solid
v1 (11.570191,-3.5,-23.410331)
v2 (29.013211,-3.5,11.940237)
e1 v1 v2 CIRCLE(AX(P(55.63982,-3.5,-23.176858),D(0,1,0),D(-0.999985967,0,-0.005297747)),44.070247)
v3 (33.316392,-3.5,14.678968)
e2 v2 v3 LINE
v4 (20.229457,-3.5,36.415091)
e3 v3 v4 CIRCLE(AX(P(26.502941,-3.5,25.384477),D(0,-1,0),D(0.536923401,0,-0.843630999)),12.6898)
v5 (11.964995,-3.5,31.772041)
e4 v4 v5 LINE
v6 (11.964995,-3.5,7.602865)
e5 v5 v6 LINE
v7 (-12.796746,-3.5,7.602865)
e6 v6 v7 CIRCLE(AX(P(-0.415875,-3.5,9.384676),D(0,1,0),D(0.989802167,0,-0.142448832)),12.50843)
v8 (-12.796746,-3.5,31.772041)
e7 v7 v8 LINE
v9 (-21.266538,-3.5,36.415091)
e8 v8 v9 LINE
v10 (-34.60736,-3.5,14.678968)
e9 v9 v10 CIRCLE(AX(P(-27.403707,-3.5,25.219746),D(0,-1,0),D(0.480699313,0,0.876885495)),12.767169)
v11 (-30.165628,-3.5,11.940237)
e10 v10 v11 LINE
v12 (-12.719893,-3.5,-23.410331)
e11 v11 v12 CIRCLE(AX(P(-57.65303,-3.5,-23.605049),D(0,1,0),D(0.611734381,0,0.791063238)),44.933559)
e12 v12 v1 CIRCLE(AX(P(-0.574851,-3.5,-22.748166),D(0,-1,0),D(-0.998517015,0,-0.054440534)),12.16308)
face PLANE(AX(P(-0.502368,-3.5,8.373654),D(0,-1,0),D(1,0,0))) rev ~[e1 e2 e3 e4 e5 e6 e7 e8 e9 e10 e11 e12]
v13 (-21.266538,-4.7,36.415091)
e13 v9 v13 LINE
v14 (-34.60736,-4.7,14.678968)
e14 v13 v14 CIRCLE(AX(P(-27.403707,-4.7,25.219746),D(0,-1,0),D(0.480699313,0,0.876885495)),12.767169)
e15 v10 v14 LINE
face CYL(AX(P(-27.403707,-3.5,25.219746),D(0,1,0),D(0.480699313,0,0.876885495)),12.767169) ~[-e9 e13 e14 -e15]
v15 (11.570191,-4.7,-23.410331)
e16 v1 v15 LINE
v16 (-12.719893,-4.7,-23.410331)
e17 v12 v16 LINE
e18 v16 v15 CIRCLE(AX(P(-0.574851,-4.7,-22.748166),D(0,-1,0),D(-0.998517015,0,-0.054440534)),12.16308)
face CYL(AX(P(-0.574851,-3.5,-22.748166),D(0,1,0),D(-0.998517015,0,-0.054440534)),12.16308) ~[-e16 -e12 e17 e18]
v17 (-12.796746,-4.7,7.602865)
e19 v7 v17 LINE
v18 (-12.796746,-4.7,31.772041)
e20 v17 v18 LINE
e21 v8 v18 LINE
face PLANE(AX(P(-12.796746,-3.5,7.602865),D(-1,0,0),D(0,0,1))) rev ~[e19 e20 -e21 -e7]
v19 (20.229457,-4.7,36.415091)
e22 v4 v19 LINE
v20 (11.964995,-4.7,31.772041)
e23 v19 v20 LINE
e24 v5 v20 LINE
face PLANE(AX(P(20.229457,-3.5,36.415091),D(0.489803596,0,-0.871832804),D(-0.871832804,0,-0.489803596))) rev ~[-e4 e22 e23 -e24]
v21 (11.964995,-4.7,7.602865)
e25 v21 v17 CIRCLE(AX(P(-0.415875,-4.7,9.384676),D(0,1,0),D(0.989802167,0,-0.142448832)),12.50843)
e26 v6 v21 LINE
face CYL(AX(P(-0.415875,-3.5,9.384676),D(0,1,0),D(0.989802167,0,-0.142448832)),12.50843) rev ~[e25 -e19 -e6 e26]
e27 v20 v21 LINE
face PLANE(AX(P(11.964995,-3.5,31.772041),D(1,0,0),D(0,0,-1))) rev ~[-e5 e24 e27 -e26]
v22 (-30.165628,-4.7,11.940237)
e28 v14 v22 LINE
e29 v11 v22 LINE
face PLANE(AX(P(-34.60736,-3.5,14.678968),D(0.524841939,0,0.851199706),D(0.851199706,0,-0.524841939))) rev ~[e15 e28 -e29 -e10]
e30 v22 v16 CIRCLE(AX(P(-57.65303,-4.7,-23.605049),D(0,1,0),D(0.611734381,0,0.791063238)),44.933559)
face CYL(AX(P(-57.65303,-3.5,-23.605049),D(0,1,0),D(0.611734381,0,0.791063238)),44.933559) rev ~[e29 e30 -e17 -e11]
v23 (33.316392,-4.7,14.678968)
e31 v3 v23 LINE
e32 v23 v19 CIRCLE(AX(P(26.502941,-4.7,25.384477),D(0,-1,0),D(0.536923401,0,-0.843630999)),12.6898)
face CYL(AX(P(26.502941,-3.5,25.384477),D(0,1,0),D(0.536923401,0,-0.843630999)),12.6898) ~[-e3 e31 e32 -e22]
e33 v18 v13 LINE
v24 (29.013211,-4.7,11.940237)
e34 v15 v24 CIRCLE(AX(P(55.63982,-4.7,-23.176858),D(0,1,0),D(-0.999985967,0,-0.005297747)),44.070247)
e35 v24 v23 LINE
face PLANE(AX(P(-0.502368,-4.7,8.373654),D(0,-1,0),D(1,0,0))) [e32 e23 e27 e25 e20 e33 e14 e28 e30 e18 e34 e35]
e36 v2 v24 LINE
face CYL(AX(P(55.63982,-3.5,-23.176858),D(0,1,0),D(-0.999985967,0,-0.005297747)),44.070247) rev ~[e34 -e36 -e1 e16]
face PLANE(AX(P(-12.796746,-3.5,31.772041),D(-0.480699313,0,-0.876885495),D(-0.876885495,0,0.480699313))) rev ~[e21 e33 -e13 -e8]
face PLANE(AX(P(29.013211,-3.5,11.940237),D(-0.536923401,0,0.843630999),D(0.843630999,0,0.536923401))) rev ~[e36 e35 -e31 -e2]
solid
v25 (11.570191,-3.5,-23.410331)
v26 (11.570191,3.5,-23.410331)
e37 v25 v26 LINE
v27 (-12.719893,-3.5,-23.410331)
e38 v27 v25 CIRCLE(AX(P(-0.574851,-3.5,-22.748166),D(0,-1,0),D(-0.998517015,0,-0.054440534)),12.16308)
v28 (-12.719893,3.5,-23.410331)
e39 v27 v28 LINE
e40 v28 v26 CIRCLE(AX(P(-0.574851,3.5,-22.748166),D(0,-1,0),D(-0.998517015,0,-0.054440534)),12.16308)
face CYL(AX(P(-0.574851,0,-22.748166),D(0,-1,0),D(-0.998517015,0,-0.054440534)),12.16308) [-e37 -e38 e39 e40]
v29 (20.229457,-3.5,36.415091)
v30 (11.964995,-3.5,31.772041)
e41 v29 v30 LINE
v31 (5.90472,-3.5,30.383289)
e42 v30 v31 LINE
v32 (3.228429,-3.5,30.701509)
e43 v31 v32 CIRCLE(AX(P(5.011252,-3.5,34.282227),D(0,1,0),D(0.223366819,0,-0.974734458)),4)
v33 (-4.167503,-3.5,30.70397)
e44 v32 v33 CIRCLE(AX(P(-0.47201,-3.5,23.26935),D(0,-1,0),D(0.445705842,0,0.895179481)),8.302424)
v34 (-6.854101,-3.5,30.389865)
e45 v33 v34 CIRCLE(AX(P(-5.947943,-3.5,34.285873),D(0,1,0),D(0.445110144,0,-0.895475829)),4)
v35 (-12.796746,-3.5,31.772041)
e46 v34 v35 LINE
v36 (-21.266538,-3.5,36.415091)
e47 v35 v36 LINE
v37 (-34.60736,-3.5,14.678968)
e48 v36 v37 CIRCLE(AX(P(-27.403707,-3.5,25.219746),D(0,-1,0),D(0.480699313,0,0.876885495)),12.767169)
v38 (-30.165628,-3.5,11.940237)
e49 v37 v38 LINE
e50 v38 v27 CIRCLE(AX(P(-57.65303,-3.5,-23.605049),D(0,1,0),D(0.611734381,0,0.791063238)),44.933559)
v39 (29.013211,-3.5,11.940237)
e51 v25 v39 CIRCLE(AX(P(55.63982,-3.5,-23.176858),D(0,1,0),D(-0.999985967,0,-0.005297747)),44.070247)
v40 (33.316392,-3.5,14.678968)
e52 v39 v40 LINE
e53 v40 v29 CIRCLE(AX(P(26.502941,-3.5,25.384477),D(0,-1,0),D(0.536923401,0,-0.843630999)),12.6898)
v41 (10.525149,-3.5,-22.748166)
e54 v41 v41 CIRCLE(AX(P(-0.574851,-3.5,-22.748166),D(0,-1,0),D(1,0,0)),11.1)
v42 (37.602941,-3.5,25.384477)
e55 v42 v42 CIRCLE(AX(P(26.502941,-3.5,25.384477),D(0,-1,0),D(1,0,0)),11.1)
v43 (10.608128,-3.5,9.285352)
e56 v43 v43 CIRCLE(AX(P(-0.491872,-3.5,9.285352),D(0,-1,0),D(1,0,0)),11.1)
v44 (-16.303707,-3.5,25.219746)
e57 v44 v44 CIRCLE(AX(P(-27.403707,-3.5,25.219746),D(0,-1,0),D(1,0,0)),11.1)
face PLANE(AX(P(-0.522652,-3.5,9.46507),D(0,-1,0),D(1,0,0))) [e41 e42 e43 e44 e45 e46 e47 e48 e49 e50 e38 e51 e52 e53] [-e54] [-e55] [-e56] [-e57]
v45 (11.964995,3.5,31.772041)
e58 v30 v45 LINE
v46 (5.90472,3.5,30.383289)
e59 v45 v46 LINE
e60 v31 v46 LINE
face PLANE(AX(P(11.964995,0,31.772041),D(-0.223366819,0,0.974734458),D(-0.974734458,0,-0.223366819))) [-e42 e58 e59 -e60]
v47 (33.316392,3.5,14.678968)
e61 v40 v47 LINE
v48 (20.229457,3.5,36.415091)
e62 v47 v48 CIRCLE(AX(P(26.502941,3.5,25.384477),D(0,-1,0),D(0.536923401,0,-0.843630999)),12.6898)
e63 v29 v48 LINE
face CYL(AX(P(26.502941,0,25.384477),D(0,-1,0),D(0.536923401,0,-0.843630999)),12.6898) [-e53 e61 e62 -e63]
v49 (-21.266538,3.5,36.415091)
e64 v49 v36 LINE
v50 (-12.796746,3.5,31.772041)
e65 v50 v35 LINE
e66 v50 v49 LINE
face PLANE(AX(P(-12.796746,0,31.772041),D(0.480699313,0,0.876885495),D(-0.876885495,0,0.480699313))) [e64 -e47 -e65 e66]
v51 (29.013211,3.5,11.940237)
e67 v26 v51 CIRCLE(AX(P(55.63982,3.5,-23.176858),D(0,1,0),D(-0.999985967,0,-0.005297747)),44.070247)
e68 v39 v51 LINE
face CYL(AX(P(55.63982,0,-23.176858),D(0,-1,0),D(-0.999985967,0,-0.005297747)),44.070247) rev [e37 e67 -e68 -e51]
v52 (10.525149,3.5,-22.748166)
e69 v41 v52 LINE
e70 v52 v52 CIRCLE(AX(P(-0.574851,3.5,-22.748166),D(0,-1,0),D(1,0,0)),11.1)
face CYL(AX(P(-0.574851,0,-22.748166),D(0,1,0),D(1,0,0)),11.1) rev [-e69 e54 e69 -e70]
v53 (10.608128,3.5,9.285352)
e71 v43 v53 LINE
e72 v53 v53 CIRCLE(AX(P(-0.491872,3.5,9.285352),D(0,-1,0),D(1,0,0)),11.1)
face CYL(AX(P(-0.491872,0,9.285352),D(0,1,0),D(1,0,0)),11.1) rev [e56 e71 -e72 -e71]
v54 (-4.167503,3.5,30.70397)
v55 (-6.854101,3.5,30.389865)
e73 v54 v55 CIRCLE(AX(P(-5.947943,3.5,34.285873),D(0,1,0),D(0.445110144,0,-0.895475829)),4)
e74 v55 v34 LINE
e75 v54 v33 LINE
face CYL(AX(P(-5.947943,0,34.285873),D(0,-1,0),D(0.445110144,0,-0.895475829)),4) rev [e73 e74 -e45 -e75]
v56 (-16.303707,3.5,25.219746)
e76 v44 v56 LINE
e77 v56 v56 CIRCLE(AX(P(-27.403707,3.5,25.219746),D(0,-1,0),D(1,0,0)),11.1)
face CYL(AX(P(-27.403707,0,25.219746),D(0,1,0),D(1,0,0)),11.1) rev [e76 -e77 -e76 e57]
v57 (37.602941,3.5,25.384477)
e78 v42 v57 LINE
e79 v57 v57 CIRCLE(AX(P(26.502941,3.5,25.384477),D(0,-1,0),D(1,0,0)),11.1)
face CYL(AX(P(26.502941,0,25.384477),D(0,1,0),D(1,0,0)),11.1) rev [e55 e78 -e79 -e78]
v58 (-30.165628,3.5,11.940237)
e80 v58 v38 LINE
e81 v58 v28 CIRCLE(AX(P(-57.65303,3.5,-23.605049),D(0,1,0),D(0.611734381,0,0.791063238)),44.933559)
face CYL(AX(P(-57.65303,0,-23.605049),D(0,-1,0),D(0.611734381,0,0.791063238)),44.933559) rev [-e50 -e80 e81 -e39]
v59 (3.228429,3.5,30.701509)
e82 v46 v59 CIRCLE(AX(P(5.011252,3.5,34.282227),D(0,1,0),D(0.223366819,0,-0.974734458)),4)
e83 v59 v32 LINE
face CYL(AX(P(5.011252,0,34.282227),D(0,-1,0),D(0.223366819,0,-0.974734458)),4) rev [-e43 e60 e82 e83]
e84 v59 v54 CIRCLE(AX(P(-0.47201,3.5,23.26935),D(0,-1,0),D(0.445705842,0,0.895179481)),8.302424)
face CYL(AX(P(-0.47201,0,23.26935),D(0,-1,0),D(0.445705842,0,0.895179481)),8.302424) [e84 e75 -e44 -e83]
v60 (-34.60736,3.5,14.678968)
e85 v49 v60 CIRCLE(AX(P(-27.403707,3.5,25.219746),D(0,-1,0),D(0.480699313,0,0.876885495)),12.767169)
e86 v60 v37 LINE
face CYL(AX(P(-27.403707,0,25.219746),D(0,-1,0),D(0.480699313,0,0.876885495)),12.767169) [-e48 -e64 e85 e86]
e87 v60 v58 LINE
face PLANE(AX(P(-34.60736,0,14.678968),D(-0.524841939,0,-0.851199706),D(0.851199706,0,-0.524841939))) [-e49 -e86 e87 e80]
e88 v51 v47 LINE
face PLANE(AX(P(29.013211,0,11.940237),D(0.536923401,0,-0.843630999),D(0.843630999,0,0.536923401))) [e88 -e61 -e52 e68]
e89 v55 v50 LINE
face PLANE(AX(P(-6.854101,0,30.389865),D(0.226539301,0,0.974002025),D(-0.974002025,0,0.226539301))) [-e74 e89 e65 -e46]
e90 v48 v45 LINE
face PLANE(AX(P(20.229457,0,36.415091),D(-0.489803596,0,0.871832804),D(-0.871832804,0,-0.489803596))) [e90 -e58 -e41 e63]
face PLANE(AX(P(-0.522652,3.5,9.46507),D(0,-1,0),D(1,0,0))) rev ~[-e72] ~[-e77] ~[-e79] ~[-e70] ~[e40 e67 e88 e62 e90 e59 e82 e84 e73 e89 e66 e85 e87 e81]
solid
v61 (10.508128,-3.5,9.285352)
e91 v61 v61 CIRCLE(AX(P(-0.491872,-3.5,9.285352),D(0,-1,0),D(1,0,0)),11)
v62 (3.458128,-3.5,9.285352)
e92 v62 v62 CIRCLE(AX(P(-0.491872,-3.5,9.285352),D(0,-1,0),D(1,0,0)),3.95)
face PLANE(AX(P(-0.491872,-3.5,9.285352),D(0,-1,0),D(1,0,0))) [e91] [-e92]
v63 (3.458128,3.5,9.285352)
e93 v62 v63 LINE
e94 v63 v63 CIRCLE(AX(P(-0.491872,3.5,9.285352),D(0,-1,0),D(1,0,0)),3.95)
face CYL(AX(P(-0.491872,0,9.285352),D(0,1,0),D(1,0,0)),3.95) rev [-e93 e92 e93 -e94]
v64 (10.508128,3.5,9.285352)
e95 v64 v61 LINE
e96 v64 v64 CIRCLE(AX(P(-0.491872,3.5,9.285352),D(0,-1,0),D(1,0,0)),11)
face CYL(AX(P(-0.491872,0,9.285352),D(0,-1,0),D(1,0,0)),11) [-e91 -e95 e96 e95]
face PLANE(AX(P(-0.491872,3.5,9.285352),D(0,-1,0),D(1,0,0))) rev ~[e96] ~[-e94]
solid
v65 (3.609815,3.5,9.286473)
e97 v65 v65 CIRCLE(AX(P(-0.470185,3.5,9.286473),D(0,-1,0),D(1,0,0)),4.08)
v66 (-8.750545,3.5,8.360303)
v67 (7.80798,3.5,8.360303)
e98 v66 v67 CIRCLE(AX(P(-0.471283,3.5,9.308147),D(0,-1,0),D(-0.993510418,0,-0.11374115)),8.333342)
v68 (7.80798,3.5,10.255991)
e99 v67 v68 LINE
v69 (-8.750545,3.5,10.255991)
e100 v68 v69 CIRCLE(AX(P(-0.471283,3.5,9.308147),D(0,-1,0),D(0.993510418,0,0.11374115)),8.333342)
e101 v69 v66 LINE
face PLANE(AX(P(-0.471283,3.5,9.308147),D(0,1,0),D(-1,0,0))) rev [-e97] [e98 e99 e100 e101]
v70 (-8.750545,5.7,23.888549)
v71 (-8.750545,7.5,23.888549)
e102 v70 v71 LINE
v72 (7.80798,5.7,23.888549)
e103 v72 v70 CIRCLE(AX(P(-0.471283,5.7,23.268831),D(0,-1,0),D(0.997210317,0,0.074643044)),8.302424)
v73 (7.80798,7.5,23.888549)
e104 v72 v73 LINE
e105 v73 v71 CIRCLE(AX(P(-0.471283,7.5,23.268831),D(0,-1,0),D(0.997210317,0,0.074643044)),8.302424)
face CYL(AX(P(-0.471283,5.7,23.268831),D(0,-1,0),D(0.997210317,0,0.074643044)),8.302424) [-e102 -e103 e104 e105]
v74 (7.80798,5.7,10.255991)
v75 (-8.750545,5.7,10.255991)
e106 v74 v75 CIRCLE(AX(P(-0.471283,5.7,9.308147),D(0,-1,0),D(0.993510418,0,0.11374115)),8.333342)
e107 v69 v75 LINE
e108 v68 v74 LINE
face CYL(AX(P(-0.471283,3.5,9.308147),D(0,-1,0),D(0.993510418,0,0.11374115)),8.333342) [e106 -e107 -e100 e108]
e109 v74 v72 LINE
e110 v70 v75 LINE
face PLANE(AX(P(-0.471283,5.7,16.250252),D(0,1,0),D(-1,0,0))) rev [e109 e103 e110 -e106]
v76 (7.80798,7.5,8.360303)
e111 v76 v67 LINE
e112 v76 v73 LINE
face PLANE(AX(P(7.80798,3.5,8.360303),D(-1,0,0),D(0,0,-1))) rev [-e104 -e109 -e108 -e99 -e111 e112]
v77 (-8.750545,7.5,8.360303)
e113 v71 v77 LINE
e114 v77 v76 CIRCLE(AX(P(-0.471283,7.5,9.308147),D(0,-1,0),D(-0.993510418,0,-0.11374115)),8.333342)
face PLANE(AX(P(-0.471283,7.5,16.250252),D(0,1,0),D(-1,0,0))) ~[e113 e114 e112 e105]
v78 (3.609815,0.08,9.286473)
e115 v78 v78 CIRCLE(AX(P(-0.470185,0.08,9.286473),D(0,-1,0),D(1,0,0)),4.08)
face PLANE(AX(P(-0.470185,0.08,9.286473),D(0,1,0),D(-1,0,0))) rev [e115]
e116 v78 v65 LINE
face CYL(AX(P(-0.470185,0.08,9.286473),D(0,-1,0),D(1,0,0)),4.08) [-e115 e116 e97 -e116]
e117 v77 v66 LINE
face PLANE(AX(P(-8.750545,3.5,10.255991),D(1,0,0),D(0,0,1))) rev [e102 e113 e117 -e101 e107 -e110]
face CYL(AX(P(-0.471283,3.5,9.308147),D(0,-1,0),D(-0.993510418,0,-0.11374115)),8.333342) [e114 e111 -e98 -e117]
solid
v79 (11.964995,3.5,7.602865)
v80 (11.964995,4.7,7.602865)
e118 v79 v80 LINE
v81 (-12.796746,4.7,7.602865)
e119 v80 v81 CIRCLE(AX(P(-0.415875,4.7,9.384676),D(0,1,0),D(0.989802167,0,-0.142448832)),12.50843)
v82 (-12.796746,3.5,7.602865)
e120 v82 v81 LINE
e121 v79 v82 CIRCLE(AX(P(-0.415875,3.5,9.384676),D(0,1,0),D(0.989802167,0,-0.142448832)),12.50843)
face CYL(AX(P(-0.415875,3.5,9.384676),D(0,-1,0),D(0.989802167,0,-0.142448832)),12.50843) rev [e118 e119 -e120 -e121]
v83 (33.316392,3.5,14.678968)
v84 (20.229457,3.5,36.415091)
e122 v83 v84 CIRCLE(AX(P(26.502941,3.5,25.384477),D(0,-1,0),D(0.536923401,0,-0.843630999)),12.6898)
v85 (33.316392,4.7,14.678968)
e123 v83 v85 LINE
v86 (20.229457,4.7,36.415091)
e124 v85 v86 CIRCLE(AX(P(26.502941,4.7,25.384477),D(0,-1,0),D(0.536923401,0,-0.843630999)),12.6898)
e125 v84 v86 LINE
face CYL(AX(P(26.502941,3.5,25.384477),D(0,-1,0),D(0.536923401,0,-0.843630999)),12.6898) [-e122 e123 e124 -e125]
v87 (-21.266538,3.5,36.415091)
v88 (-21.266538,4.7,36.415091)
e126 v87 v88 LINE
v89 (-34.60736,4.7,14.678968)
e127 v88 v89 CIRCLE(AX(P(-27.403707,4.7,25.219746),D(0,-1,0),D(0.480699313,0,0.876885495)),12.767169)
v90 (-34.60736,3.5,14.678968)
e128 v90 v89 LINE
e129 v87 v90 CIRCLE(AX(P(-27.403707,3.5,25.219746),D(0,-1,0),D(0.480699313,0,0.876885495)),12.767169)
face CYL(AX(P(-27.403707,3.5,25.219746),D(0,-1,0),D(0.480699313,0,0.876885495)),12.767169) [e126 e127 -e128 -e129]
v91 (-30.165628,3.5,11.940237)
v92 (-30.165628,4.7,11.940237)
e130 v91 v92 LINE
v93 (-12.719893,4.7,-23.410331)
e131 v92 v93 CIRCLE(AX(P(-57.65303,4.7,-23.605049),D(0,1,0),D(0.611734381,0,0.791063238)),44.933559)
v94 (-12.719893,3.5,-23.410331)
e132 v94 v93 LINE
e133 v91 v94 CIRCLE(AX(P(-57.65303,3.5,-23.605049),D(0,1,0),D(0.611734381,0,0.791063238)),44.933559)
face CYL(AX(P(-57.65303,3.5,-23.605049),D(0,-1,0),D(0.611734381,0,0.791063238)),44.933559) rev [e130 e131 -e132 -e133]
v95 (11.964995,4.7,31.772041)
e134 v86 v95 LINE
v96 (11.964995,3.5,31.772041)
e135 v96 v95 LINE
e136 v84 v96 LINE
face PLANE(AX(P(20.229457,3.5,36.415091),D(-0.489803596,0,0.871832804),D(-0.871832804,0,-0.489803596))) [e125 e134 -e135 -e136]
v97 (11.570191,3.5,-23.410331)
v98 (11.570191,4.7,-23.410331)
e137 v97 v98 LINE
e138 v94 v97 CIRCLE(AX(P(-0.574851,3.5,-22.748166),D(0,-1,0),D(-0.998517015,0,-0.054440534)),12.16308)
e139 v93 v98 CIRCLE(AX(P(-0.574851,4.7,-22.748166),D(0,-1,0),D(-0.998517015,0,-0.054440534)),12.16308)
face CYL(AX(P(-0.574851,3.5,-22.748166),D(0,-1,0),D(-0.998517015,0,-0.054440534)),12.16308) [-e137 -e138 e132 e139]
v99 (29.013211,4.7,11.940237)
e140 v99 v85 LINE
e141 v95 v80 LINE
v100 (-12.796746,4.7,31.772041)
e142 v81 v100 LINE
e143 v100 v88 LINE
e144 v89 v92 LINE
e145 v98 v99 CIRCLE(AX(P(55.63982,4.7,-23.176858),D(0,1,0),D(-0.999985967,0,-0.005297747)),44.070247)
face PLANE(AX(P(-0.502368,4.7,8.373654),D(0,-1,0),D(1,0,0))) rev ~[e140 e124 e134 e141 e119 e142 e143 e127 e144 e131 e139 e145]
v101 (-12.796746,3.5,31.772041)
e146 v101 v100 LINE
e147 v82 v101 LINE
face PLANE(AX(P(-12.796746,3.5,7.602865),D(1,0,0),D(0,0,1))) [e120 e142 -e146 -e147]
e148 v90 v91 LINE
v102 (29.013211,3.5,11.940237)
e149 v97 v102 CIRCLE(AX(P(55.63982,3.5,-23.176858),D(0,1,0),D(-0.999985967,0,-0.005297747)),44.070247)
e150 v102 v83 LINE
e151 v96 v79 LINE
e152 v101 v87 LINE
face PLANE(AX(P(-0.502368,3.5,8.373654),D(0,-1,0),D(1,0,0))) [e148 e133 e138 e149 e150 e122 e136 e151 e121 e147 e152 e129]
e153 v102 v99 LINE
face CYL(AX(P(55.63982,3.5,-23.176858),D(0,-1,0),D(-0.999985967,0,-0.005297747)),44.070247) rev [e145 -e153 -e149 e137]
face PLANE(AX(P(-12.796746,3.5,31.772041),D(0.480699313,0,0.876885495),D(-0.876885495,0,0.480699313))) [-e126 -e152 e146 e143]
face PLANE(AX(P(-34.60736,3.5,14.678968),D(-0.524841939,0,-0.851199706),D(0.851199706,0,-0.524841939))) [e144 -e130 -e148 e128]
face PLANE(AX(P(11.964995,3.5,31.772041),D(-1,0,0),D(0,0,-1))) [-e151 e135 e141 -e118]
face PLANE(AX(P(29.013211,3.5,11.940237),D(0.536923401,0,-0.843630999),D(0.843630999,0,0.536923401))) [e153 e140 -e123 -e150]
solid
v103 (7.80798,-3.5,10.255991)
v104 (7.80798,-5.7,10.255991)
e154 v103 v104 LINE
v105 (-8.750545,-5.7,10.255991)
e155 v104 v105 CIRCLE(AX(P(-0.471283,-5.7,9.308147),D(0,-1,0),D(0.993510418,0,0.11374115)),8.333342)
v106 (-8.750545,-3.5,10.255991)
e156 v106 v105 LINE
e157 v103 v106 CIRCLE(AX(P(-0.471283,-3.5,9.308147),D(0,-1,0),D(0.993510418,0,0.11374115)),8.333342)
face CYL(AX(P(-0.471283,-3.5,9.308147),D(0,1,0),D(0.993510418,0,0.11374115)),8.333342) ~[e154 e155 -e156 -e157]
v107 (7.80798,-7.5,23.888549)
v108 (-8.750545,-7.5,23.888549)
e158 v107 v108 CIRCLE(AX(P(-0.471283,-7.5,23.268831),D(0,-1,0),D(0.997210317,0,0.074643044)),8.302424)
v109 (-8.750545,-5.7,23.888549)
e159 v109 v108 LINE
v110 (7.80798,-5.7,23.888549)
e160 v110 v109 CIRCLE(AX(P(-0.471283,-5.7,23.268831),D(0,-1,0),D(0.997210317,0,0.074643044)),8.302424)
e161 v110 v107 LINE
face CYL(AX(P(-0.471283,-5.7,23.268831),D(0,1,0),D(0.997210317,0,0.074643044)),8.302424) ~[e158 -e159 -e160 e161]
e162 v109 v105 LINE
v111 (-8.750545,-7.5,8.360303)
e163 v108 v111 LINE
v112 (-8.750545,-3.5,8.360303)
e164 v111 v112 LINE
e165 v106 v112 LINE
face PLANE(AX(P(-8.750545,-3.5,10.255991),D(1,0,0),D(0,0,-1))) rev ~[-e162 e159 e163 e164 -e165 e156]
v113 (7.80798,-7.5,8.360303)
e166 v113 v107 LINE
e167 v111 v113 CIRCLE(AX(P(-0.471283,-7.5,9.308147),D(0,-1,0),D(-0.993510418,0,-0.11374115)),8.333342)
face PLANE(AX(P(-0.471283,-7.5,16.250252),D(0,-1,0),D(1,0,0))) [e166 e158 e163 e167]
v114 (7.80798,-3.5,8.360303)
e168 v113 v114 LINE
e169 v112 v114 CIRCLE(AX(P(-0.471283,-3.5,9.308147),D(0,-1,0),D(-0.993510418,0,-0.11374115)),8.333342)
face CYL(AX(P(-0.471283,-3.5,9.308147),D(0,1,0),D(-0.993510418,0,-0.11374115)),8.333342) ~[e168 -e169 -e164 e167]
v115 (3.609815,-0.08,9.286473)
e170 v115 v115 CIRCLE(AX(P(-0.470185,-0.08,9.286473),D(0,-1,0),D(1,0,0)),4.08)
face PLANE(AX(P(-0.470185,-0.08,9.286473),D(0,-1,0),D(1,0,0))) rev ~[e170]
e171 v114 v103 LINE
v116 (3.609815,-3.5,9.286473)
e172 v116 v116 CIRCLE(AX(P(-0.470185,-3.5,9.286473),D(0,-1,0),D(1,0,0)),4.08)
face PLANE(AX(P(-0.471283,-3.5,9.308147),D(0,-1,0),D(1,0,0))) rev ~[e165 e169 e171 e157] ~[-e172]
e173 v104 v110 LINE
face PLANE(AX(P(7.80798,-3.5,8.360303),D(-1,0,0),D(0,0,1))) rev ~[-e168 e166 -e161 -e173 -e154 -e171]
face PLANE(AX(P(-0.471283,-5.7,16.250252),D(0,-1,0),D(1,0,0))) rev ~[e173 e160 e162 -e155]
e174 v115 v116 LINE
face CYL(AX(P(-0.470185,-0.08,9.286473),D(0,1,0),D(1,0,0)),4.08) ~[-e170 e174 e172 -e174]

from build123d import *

# Parameters (mm, degrees)
F1_START  = 4.375
F1_DEPTH  = 1.5
F2_R      = 13.875
F3_DEPTH  = 4.375
F5_START  = -4.375
F5_DEPTH  = 1.5
F10_START = 7.125
F10_DEPTH = 2.25
F11_START = -5.5
F11_DEPTH = 2
F12_START = 4.375
F12_DEPTH = 2.75
F13_START = -3.5
F13_DEPTH = 2
F16_START = 0.1
F14_R     = 5.1
F16_DEPTH = 4.275
F17_START = -0.395
F15_R     = 4.14
F17_DEPTH = 3.105
F18_R     = 13.75
F18_R_2   = 4.9375
F19_DEPTH = 4.375
F20_SCALE = 0.8


# Not quite as in the source:
# - a feature names something its author has since deleted; it is built from what else it names


with BuildPart() as f1:
    # F0 (on Front) → F1 (new body)
    with BuildSketch(Plane.XZ.offset(F1_START)):
        with BuildLine():
            Line((25.2868216485, 45.5188639462), (14.9562442675, 39.715051651))
            Line((14.9562442675, 39.715051651), (14.9562442675, 9.5035806298))
            ThreePointArc((14.9562442675, 9.5035806298), (-0.5198442377, -3.9046924703), (-15.995932743, 9.5035806298))
            Line((-15.995932743, 9.5035806298), (-15.995932743, 39.715051651))
            Line((-15.995932743, 39.715051651), (-26.5831723809, 45.5188639462))
            ThreePointArc((-26.5831723809, 45.5188639462), (-47.8560530267, 39.8727264749), (-43.2591997087, 18.3487106115))
            Line((-43.2591997087, 18.3487106115), (-37.7070344985, 14.9252964184))
            ThreePointArc((-37.7070344985, 14.9252964184), (-21.6988985987, -4.6496789904), (-15.8998668194, -29.262913391))
            ThreePointArc((-15.8998668194, -29.262913391), (-0.7185637951, -43.6390577842), (14.4627392292, -29.262913391))
            ThreePointArc((14.4627392292, -29.262913391), (20.148592377, -4.5950626204), (36.2665131688, 14.9252964184))
            Line((36.2665131688, 14.9252964184), (41.6454896331, 18.3487106115))
            ThreePointArc((41.6454896331, 18.3487106115), (46.7179439882, 39.9124542781), (25.2868216485, 45.5188639462))
        make_face()
    extrude(amount=F1_DEPTH)


with BuildPart() as f3:
    # F2 (on Front) → F3 (new body, symmetric)
    with BuildSketch(Plane.XZ):
        with BuildLine():
            ThreePointArc((7.3808994443, 37.9791115091), (5.6737072201, 37.8877583952), (4.0355361424, 38.3768863971))
            ThreePointArc((4.0355361424, 38.3768863971), (-0.5865597778, 39.4647162659), (-5.209378452, 38.3799619045))
            ThreePointArc((-5.209378452, 38.3799619045), (-6.854306785, 37.8911677077), (-8.5676256765, 37.9873309216))
            Line((-8.5676256765, 37.9873309216), (-15.995932743, 39.715051651))
            Line((-15.995932743, 39.715051651), (-26.5831723809, 45.5188639462))
            ThreePointArc((-26.5831723809, 45.5188639462), (-47.8560530267, 39.8727264749), (-43.2591997087, 18.3487106115))
            Line((-43.2591997087, 18.3487106115), (-37.7070344985, 14.9252964184))
            ThreePointArc((-37.7070344985, 14.9252964184), (-21.6988985987, -4.6496789904), (-15.8998668194, -29.262913391))
            ThreePointArc((-15.8998668194, -29.262913391), (-0.7185637951, -43.6390577842), (14.4627392292, -29.262913391))
            ThreePointArc((14.4627392292, -29.262913391), (20.148592377, -4.5950626204), (36.2665131688, 14.9252964184))
            Line((36.2665131688, 14.9252964184), (41.6454896331, 18.3487106115))
            ThreePointArc((41.6454896331, 18.3487106115), (46.7179439882, 39.9124542781), (25.2868216485, 45.5188639462))
            Line((25.2868216485, 45.5188639462), (14.9562442675, 39.715051651))
            Line((14.9562442675, 39.715051651), (7.3808994443, 37.9791115091))
        make_face()
        with Locations((-0.7185637951, -28.4352076707)):
            Circle(F2_R, mode=Mode.SUBTRACT)
        with Locations((-0.6148405476, 11.6066905533)):
            Circle(F2_R, mode=Mode.SUBTRACT)
        with Locations((-34.2546339944, 31.5246824765)):
            Circle(F2_R, mode=Mode.SUBTRACT)
        with Locations((33.1286761467, 31.7305968542)):
            Circle(F2_R, mode=Mode.SUBTRACT)
    extrude(amount=F3_DEPTH, both=True)


with BuildPart() as f5:
    # F4 (on Front) → F5 (new body)
    with BuildSketch(Plane.XZ.offset(F5_START)):
        with BuildLine():
            Line((25.2868216485, 45.5188639462), (14.9562442675, 39.715051651))
            Line((14.9562442675, 39.715051651), (14.9562442675, 9.5035806298))
            ThreePointArc((14.9562442675, 9.5035806298), (-0.5198442377, -3.9046924703), (-15.995932743, 9.5035806298))
            Line((-15.995932743, 9.5035806298), (-15.995932743, 39.715051651))
            Line((-15.995932743, 39.715051651), (-26.5831723809, 45.5188639462))
            ThreePointArc((-26.5831723809, 45.5188639462), (-47.8560530267, 39.8727264749), (-43.2591997087, 18.3487106115))
            Line((-43.2591997087, 18.3487106115), (-37.7070344985, 14.9252964184))
            ThreePointArc((-37.7070344985, 14.9252964184), (-21.6988985987, -4.6496789904), (-15.8998668194, -29.262913391))
            ThreePointArc((-15.8998668194, -29.262913391), (-0.7185637951, -43.6390577842), (14.4627392292, -29.262913391))
            ThreePointArc((14.4627392292, -29.262913391), (20.148592377, -4.5950626204), (36.2665131688, 14.9252964184))
            Line((36.2665131688, 14.9252964184), (41.6454896331, 18.3487106115))
            ThreePointArc((41.6454896331, 18.3487106115), (46.7179439882, 39.9124542781), (25.2868216485, 45.5188639462))
        make_face()
    extrude(amount=-F5_DEPTH)


with BuildPart() as f10:
    # F6 (on Front) → F10 (new body)
    with BuildSketch(Plane.XZ.offset(F10_START)):
        with BuildLine():
            ThreePointArc((9.7599746659, 29.8606865108), (-0.589103438, 39.4640683192), (-10.9381815419, 29.8606865108))
            Line((-10.9381815419, 29.8606865108), (-10.9381815419, 10.4503789917))
            ThreePointArc((-10.9381815419, 10.4503789917), (-0.589103438, 1.2185059392), (9.7599746659, 10.4503789917))
            Line((9.7599746659, 10.4503789917), (9.7599746659, 29.8606865108))
        make_face()
    extrude(amount=F10_DEPTH)

    # F8 (on Front) → F12 (join)
    with BuildSketch(Plane.XZ.offset(F12_START)):
        with BuildLine():
            Line((9.7599746659, 10.4503789917), (9.7599746659, 12.819988866))
            ThreePointArc((9.7599746659, 12.819988866), (-0.589103438, 22.0518619185), (-10.9381815419, 12.819988866))
            Line((-10.9381815419, 12.819988866), (-10.9381815419, 10.4503789917))
            ThreePointArc((-10.9381815419, 10.4503789917), (-0.589103438, 1.2185059392), (9.7599746659, 10.4503789917))
        make_face()
    extrude(amount=F12_DEPTH)

    # F14 (on Front) → F16 (join)
    with BuildSketch(Plane.XZ.offset(F16_START)):
        with Locations((-0.5877316771, 11.6080907404)):
            Circle(F14_R)
    extrude(amount=F16_DEPTH)


with BuildPart() as f11:
    # F7 (on Front) → F11 (new body)
    with BuildSketch(Plane.XZ.offset(F11_START)):
        with BuildLine():
            ThreePointArc((9.7599746659, 29.8606865108), (-0.589103438, 39.4640683192), (-10.9381815419, 29.8606865108))
            Line((-10.9381815419, 29.8606865108), (-10.9381815419, 10.4503789917))
            ThreePointArc((-10.9381815419, 10.4503789917), (-0.589103438, 1.2185059392), (9.7599746659, 10.4503789917))
            Line((9.7599746659, 10.4503789917), (9.7599746659, 29.8606865108))
        make_face()
    extrude(amount=-F11_DEPTH)

    # F9 (on Front) → F13 (join)
    with BuildSketch(Plane.XZ.offset(F13_START)):
        with BuildLine():
            Line((9.7599746659, 10.4503789917), (9.7599746659, 12.819988866))
            ThreePointArc((9.7599746659, 12.819988866), (-0.589103438, 22.0518619185), (-10.9381815419, 12.819988866))
            Line((-10.9381815419, 12.819988866), (-10.9381815419, 10.4503789917))
            ThreePointArc((-10.9381815419, 10.4503789917), (-0.589103438, 1.2185059392), (9.7599746659, 10.4503789917))
        make_face()
    extrude(amount=-F13_DEPTH)

    # F15 (on Front) → F17 (join)
    with BuildSketch(Plane.XZ.offset(F17_START)):
        with Locations((-0.589103438, 11.6351839289)):
            Circle(F15_R)
    extrude(amount=-F17_DEPTH)


with BuildPart() as f19:
    # F18 (on Front) → F19 (new body, symmetric)
    with BuildSketch(Plane.XZ):
        with Locations((-0.6148405476, 11.6066905533)):
            Circle(F18_R)
        with Locations((-0.6148405476, 11.6066905533)):
            Circle(F18_R_2, mode=Mode.SUBTRACT)
    extrude(amount=F19_DEPTH, both=True)


with BuildPart() as f3_1:
    # F20: moved
    add(f3.part.scale(F20_SCALE))


with BuildPart() as f5_1:
    # F20: moved
    add(f5.part.scale(F20_SCALE))


with BuildPart() as f10_1:
    # F20: moved
    add(f10.part.scale(F20_SCALE))


with BuildPart() as f11_1:
    # F20: moved
    add(f11.part.scale(F20_SCALE))


with BuildPart() as f1_1:
    # F20: moved
    add(f1.part.scale(F20_SCALE))


with BuildPart() as f19_1:
    # F20: moved
    add(f19.part.scale(F20_SCALE))


with BuildPart() as f22_1:
    # F22: instance of F10
    add(f10_1.part.mirror(Plane.XZ))


solid = Compound([f3_1.part, f5_1.part, f10_1.part, f1_1.part, f19_1.part, f22_1.part])
